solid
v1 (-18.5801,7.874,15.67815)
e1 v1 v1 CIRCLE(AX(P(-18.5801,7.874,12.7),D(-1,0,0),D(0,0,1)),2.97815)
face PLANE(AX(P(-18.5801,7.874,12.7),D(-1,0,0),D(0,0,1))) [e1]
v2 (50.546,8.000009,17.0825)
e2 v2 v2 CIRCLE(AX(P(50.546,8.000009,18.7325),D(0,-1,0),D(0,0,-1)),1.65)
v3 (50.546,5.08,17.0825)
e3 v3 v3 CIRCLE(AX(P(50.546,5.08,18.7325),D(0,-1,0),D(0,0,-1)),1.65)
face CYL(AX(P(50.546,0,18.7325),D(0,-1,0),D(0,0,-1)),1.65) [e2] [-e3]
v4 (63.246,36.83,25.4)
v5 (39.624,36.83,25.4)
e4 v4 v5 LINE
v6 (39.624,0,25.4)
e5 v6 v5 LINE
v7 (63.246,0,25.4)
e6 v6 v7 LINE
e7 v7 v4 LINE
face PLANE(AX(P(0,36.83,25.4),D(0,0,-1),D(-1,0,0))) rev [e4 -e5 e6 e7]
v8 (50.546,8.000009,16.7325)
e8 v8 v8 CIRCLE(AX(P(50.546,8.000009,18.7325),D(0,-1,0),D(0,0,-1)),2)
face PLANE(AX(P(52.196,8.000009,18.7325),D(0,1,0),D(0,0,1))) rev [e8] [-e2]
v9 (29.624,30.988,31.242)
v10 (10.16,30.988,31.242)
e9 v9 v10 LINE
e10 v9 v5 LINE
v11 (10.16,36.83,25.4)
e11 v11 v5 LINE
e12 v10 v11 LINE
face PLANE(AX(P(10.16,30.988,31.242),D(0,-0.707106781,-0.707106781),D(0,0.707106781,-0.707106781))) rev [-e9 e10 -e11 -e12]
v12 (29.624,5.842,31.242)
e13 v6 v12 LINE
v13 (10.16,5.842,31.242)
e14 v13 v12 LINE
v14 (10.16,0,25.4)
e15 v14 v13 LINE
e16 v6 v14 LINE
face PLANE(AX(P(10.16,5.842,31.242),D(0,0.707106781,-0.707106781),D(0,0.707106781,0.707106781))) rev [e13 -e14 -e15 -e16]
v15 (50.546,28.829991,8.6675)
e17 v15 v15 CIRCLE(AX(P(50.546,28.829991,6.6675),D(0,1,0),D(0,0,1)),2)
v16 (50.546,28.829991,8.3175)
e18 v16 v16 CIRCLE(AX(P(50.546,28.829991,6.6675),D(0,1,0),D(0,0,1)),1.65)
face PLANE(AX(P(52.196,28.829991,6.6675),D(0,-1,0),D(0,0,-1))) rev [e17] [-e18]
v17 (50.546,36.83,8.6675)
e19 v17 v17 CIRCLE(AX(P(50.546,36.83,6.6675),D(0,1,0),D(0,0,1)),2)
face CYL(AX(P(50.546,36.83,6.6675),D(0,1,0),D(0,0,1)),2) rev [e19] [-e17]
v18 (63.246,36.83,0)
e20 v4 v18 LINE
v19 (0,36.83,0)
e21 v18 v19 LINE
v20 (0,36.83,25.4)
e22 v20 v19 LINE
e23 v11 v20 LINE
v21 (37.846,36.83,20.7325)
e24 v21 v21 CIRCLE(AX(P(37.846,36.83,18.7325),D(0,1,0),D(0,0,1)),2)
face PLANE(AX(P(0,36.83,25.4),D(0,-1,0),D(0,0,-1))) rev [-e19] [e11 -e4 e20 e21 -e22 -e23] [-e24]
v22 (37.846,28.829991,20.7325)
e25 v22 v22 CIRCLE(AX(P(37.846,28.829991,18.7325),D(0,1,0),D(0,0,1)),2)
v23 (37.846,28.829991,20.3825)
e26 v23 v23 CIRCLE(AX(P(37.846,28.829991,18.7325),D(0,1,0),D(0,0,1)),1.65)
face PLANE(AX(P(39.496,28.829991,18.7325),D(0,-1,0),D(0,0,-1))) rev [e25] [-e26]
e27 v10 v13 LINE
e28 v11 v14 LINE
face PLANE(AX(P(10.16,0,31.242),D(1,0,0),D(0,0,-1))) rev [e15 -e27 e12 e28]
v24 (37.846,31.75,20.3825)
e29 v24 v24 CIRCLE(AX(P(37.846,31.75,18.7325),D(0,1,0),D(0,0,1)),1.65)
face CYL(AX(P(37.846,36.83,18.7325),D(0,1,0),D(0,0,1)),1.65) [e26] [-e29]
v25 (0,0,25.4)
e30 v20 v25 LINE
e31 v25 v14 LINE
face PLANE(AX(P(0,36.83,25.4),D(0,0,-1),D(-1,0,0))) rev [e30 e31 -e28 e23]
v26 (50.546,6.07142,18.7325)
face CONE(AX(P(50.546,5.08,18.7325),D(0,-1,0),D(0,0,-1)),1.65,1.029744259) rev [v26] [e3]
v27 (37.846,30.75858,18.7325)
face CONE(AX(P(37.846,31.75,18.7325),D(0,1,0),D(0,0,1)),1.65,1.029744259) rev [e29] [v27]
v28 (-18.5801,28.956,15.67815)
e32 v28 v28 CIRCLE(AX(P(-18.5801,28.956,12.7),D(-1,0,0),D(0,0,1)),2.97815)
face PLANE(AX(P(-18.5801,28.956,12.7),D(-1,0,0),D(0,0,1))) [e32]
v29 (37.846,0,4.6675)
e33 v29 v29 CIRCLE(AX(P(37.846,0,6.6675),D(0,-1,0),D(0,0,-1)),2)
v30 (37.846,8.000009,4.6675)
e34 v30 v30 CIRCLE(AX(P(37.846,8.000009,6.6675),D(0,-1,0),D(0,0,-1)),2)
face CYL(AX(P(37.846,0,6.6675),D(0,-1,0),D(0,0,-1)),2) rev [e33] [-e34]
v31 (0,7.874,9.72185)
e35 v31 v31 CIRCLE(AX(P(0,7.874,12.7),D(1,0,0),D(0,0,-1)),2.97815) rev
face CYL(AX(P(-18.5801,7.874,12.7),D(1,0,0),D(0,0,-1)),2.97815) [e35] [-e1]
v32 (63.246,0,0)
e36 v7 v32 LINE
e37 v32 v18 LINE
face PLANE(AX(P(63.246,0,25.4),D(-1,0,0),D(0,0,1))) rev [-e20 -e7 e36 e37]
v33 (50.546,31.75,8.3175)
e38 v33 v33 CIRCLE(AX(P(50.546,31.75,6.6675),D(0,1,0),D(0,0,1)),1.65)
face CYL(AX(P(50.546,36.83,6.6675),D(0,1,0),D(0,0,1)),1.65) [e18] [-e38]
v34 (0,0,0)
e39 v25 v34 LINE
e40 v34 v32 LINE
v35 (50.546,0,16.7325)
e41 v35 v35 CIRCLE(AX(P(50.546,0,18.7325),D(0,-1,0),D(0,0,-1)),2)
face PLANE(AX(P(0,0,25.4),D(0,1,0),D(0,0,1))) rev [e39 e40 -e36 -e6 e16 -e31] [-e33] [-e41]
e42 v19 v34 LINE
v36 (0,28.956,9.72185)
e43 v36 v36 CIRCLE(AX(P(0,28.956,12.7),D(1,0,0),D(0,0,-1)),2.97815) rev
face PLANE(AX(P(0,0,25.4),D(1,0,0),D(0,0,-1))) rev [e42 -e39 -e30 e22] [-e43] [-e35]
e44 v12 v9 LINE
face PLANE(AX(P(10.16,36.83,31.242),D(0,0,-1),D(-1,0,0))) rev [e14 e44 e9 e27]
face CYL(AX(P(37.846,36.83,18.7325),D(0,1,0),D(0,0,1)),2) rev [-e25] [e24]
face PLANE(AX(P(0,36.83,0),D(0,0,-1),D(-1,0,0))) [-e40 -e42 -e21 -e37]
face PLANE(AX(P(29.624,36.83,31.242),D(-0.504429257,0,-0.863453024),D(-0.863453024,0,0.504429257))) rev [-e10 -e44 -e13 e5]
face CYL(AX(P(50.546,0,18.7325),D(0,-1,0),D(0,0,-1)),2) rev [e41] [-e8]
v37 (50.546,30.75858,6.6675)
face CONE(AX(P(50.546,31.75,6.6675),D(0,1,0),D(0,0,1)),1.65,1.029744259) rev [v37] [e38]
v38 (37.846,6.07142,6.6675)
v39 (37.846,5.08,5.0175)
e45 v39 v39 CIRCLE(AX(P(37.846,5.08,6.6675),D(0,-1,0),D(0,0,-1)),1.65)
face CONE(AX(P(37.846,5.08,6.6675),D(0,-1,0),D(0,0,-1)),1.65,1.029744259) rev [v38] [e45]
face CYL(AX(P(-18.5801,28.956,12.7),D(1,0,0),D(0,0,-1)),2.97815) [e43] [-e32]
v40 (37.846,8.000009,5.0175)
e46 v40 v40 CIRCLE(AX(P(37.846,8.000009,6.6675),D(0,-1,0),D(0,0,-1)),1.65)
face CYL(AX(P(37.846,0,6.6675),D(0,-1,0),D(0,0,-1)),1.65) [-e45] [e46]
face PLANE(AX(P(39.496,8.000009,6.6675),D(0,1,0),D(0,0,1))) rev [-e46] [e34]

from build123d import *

# Parameters (mm, degrees)
SKETCH1_W                      = 63.246
SKETCH1_H                      = 36.83
EXTRUDE1_DEPTH                 = 25.4
M4X0_7_TAPPED_HOLE1_AT_2_COUNT = 2
M4X0_7_TAPPED_HOLE1_AT_2_PITCH = 17.517255065
M4X0_7_TAPPED_HOLE2_AT_2_COUNT = 2
M4X0_7_TAPPED_HOLE2_AT_2_PITCH = 17.517255065
SKETCH6_W                      = 29.464
SKETCH6_H                      = 36.83
EXTRUDE2_DEPTH                 = 5.842
CHAMFER1_SIZE                  = 5.842
CHAMFER2_SIZE                  = 5.842
CHAMFER3_SIZE2                 = 5.842
CHAMFER3_SIZE                  = 10
SKETCH7_R                      = 2.97815
EXTRUDE3_DEPTH                 = 18.5801


with BuildPart() as part:
    # Sketch1 → Extrude1 (new body)
    with BuildSketch(Plane.XY):
        with Locations((31.623, 18.415)):
            Rectangle(SKETCH1_W, SKETCH1_H)
    extrude(amount=EXTRUDE1_DEPTH)

    # Sketch2 → M4x0.7 Tapped Hole1 (revolve, cut)
    with BuildSketch(Plane(origin=(37.846, 0, 6.6675), x_dir=(0, 0, -1), z_dir=(1, 0, 0))):
        Polygon((0, 0), (0, 6.071420021), (1.65, 5.08), (1.65, 8.0000094), (2, 8.0000094), (2, 0), align=None)
    m4x0_7_tapped_hole1 = revolve(axis=Axis((37.846, -6.35, 6.6675), (0, 1, 0)), mode=Mode.SUBTRACT)

    # M4x0.7 Tapped Hole1 at 2: M4x0.7 Tapped Hole1 ×2
    with Locations(*[Vector(0.7249994335944138, 0, 0.6887494619146932) * (i * M4X0_7_TAPPED_HOLE1_AT_2_PITCH) for i in range(1, M4X0_7_TAPPED_HOLE1_AT_2_COUNT)]):
        add(m4x0_7_tapped_hole1, mode=Mode.SUBTRACT)

    # Sketch5 → M4x0.7 Tapped Hole2 (revolve, cut)
    with BuildSketch(Plane(origin=(50.546, 36.83, 6.6675), x_dir=(0, 0, 1), z_dir=(1, 0, 0))):
        Polygon((0, 0), (0, 6.071420021), (1.65, 5.08), (1.65, 8.0000094), (2, 8.0000094), (2, 0), align=None)
    m4x0_7_tapped_hole2 = revolve(axis=Axis((50.546, 43.18, 6.6675), (0, -1, 0)), mode=Mode.SUBTRACT)

    # M4x0.7 Tapped Hole2 at 2: M4x0.7 Tapped Hole2 ×2
    with Locations(*[Vector(-0.7249994335944137, 0, 0.6887494619146932) * (i * M4X0_7_TAPPED_HOLE2_AT_2_PITCH) for i in range(1, M4X0_7_TAPPED_HOLE2_AT_2_COUNT)]):
        add(m4x0_7_tapped_hole2, mode=Mode.SUBTRACT)

    # Sketch6 → Extrude2 (add)
    with BuildSketch(Plane.XY.offset(25.4)):
        with Locations((24.892, 18.415)):
            Rectangle(SKETCH6_W, SKETCH6_H)
    extrude(amount=EXTRUDE2_DEPTH)

    # Chamfer1
    chamfer1_edges = [part.edges().sort_by_distance(p)[0] for p in [
        (24.892, 0, 31.242),
    ]]
    chamfer(chamfer1_edges, length=CHAMFER1_SIZE)

    # Chamfer2
    chamfer2_edges = [part.edges().sort_by_distance(p)[0] for p in [
        (24.892, 36.83, 31.242),
    ]]
    chamfer(chamfer2_edges, length=CHAMFER2_SIZE)

    # Chamfer3
    chamfer3_edges = [part.edges().sort_by_distance(p)[0] for p in [
        (39.624, 18.415, 31.242),
    ]]
    chamfer3_side = [part.faces().sort_by_distance(p)[0] for p in [
        (39.50716, 18.415, 31.242),
    ]]
    chamfer(chamfer3_edges, length=CHAMFER3_SIZE - 0.0001, length2=CHAMFER3_SIZE2 - 0.0001, reference=chamfer3_side[0])  # a hair under: the kernel refuses the full size

    # Sketch7 → Extrude3 (add)
    with BuildSketch(Plane.ZY):
        with Locations(Location((12.7, 28.956, 0), (0, 0, 180))):
            Circle(SKETCH7_R)
        with Locations(Location((12.7, 7.874, 0), (0, 0, 180))):
            Circle(SKETCH7_R)
    extrude(amount=EXTRUDE3_DEPTH)


solid = part.part
